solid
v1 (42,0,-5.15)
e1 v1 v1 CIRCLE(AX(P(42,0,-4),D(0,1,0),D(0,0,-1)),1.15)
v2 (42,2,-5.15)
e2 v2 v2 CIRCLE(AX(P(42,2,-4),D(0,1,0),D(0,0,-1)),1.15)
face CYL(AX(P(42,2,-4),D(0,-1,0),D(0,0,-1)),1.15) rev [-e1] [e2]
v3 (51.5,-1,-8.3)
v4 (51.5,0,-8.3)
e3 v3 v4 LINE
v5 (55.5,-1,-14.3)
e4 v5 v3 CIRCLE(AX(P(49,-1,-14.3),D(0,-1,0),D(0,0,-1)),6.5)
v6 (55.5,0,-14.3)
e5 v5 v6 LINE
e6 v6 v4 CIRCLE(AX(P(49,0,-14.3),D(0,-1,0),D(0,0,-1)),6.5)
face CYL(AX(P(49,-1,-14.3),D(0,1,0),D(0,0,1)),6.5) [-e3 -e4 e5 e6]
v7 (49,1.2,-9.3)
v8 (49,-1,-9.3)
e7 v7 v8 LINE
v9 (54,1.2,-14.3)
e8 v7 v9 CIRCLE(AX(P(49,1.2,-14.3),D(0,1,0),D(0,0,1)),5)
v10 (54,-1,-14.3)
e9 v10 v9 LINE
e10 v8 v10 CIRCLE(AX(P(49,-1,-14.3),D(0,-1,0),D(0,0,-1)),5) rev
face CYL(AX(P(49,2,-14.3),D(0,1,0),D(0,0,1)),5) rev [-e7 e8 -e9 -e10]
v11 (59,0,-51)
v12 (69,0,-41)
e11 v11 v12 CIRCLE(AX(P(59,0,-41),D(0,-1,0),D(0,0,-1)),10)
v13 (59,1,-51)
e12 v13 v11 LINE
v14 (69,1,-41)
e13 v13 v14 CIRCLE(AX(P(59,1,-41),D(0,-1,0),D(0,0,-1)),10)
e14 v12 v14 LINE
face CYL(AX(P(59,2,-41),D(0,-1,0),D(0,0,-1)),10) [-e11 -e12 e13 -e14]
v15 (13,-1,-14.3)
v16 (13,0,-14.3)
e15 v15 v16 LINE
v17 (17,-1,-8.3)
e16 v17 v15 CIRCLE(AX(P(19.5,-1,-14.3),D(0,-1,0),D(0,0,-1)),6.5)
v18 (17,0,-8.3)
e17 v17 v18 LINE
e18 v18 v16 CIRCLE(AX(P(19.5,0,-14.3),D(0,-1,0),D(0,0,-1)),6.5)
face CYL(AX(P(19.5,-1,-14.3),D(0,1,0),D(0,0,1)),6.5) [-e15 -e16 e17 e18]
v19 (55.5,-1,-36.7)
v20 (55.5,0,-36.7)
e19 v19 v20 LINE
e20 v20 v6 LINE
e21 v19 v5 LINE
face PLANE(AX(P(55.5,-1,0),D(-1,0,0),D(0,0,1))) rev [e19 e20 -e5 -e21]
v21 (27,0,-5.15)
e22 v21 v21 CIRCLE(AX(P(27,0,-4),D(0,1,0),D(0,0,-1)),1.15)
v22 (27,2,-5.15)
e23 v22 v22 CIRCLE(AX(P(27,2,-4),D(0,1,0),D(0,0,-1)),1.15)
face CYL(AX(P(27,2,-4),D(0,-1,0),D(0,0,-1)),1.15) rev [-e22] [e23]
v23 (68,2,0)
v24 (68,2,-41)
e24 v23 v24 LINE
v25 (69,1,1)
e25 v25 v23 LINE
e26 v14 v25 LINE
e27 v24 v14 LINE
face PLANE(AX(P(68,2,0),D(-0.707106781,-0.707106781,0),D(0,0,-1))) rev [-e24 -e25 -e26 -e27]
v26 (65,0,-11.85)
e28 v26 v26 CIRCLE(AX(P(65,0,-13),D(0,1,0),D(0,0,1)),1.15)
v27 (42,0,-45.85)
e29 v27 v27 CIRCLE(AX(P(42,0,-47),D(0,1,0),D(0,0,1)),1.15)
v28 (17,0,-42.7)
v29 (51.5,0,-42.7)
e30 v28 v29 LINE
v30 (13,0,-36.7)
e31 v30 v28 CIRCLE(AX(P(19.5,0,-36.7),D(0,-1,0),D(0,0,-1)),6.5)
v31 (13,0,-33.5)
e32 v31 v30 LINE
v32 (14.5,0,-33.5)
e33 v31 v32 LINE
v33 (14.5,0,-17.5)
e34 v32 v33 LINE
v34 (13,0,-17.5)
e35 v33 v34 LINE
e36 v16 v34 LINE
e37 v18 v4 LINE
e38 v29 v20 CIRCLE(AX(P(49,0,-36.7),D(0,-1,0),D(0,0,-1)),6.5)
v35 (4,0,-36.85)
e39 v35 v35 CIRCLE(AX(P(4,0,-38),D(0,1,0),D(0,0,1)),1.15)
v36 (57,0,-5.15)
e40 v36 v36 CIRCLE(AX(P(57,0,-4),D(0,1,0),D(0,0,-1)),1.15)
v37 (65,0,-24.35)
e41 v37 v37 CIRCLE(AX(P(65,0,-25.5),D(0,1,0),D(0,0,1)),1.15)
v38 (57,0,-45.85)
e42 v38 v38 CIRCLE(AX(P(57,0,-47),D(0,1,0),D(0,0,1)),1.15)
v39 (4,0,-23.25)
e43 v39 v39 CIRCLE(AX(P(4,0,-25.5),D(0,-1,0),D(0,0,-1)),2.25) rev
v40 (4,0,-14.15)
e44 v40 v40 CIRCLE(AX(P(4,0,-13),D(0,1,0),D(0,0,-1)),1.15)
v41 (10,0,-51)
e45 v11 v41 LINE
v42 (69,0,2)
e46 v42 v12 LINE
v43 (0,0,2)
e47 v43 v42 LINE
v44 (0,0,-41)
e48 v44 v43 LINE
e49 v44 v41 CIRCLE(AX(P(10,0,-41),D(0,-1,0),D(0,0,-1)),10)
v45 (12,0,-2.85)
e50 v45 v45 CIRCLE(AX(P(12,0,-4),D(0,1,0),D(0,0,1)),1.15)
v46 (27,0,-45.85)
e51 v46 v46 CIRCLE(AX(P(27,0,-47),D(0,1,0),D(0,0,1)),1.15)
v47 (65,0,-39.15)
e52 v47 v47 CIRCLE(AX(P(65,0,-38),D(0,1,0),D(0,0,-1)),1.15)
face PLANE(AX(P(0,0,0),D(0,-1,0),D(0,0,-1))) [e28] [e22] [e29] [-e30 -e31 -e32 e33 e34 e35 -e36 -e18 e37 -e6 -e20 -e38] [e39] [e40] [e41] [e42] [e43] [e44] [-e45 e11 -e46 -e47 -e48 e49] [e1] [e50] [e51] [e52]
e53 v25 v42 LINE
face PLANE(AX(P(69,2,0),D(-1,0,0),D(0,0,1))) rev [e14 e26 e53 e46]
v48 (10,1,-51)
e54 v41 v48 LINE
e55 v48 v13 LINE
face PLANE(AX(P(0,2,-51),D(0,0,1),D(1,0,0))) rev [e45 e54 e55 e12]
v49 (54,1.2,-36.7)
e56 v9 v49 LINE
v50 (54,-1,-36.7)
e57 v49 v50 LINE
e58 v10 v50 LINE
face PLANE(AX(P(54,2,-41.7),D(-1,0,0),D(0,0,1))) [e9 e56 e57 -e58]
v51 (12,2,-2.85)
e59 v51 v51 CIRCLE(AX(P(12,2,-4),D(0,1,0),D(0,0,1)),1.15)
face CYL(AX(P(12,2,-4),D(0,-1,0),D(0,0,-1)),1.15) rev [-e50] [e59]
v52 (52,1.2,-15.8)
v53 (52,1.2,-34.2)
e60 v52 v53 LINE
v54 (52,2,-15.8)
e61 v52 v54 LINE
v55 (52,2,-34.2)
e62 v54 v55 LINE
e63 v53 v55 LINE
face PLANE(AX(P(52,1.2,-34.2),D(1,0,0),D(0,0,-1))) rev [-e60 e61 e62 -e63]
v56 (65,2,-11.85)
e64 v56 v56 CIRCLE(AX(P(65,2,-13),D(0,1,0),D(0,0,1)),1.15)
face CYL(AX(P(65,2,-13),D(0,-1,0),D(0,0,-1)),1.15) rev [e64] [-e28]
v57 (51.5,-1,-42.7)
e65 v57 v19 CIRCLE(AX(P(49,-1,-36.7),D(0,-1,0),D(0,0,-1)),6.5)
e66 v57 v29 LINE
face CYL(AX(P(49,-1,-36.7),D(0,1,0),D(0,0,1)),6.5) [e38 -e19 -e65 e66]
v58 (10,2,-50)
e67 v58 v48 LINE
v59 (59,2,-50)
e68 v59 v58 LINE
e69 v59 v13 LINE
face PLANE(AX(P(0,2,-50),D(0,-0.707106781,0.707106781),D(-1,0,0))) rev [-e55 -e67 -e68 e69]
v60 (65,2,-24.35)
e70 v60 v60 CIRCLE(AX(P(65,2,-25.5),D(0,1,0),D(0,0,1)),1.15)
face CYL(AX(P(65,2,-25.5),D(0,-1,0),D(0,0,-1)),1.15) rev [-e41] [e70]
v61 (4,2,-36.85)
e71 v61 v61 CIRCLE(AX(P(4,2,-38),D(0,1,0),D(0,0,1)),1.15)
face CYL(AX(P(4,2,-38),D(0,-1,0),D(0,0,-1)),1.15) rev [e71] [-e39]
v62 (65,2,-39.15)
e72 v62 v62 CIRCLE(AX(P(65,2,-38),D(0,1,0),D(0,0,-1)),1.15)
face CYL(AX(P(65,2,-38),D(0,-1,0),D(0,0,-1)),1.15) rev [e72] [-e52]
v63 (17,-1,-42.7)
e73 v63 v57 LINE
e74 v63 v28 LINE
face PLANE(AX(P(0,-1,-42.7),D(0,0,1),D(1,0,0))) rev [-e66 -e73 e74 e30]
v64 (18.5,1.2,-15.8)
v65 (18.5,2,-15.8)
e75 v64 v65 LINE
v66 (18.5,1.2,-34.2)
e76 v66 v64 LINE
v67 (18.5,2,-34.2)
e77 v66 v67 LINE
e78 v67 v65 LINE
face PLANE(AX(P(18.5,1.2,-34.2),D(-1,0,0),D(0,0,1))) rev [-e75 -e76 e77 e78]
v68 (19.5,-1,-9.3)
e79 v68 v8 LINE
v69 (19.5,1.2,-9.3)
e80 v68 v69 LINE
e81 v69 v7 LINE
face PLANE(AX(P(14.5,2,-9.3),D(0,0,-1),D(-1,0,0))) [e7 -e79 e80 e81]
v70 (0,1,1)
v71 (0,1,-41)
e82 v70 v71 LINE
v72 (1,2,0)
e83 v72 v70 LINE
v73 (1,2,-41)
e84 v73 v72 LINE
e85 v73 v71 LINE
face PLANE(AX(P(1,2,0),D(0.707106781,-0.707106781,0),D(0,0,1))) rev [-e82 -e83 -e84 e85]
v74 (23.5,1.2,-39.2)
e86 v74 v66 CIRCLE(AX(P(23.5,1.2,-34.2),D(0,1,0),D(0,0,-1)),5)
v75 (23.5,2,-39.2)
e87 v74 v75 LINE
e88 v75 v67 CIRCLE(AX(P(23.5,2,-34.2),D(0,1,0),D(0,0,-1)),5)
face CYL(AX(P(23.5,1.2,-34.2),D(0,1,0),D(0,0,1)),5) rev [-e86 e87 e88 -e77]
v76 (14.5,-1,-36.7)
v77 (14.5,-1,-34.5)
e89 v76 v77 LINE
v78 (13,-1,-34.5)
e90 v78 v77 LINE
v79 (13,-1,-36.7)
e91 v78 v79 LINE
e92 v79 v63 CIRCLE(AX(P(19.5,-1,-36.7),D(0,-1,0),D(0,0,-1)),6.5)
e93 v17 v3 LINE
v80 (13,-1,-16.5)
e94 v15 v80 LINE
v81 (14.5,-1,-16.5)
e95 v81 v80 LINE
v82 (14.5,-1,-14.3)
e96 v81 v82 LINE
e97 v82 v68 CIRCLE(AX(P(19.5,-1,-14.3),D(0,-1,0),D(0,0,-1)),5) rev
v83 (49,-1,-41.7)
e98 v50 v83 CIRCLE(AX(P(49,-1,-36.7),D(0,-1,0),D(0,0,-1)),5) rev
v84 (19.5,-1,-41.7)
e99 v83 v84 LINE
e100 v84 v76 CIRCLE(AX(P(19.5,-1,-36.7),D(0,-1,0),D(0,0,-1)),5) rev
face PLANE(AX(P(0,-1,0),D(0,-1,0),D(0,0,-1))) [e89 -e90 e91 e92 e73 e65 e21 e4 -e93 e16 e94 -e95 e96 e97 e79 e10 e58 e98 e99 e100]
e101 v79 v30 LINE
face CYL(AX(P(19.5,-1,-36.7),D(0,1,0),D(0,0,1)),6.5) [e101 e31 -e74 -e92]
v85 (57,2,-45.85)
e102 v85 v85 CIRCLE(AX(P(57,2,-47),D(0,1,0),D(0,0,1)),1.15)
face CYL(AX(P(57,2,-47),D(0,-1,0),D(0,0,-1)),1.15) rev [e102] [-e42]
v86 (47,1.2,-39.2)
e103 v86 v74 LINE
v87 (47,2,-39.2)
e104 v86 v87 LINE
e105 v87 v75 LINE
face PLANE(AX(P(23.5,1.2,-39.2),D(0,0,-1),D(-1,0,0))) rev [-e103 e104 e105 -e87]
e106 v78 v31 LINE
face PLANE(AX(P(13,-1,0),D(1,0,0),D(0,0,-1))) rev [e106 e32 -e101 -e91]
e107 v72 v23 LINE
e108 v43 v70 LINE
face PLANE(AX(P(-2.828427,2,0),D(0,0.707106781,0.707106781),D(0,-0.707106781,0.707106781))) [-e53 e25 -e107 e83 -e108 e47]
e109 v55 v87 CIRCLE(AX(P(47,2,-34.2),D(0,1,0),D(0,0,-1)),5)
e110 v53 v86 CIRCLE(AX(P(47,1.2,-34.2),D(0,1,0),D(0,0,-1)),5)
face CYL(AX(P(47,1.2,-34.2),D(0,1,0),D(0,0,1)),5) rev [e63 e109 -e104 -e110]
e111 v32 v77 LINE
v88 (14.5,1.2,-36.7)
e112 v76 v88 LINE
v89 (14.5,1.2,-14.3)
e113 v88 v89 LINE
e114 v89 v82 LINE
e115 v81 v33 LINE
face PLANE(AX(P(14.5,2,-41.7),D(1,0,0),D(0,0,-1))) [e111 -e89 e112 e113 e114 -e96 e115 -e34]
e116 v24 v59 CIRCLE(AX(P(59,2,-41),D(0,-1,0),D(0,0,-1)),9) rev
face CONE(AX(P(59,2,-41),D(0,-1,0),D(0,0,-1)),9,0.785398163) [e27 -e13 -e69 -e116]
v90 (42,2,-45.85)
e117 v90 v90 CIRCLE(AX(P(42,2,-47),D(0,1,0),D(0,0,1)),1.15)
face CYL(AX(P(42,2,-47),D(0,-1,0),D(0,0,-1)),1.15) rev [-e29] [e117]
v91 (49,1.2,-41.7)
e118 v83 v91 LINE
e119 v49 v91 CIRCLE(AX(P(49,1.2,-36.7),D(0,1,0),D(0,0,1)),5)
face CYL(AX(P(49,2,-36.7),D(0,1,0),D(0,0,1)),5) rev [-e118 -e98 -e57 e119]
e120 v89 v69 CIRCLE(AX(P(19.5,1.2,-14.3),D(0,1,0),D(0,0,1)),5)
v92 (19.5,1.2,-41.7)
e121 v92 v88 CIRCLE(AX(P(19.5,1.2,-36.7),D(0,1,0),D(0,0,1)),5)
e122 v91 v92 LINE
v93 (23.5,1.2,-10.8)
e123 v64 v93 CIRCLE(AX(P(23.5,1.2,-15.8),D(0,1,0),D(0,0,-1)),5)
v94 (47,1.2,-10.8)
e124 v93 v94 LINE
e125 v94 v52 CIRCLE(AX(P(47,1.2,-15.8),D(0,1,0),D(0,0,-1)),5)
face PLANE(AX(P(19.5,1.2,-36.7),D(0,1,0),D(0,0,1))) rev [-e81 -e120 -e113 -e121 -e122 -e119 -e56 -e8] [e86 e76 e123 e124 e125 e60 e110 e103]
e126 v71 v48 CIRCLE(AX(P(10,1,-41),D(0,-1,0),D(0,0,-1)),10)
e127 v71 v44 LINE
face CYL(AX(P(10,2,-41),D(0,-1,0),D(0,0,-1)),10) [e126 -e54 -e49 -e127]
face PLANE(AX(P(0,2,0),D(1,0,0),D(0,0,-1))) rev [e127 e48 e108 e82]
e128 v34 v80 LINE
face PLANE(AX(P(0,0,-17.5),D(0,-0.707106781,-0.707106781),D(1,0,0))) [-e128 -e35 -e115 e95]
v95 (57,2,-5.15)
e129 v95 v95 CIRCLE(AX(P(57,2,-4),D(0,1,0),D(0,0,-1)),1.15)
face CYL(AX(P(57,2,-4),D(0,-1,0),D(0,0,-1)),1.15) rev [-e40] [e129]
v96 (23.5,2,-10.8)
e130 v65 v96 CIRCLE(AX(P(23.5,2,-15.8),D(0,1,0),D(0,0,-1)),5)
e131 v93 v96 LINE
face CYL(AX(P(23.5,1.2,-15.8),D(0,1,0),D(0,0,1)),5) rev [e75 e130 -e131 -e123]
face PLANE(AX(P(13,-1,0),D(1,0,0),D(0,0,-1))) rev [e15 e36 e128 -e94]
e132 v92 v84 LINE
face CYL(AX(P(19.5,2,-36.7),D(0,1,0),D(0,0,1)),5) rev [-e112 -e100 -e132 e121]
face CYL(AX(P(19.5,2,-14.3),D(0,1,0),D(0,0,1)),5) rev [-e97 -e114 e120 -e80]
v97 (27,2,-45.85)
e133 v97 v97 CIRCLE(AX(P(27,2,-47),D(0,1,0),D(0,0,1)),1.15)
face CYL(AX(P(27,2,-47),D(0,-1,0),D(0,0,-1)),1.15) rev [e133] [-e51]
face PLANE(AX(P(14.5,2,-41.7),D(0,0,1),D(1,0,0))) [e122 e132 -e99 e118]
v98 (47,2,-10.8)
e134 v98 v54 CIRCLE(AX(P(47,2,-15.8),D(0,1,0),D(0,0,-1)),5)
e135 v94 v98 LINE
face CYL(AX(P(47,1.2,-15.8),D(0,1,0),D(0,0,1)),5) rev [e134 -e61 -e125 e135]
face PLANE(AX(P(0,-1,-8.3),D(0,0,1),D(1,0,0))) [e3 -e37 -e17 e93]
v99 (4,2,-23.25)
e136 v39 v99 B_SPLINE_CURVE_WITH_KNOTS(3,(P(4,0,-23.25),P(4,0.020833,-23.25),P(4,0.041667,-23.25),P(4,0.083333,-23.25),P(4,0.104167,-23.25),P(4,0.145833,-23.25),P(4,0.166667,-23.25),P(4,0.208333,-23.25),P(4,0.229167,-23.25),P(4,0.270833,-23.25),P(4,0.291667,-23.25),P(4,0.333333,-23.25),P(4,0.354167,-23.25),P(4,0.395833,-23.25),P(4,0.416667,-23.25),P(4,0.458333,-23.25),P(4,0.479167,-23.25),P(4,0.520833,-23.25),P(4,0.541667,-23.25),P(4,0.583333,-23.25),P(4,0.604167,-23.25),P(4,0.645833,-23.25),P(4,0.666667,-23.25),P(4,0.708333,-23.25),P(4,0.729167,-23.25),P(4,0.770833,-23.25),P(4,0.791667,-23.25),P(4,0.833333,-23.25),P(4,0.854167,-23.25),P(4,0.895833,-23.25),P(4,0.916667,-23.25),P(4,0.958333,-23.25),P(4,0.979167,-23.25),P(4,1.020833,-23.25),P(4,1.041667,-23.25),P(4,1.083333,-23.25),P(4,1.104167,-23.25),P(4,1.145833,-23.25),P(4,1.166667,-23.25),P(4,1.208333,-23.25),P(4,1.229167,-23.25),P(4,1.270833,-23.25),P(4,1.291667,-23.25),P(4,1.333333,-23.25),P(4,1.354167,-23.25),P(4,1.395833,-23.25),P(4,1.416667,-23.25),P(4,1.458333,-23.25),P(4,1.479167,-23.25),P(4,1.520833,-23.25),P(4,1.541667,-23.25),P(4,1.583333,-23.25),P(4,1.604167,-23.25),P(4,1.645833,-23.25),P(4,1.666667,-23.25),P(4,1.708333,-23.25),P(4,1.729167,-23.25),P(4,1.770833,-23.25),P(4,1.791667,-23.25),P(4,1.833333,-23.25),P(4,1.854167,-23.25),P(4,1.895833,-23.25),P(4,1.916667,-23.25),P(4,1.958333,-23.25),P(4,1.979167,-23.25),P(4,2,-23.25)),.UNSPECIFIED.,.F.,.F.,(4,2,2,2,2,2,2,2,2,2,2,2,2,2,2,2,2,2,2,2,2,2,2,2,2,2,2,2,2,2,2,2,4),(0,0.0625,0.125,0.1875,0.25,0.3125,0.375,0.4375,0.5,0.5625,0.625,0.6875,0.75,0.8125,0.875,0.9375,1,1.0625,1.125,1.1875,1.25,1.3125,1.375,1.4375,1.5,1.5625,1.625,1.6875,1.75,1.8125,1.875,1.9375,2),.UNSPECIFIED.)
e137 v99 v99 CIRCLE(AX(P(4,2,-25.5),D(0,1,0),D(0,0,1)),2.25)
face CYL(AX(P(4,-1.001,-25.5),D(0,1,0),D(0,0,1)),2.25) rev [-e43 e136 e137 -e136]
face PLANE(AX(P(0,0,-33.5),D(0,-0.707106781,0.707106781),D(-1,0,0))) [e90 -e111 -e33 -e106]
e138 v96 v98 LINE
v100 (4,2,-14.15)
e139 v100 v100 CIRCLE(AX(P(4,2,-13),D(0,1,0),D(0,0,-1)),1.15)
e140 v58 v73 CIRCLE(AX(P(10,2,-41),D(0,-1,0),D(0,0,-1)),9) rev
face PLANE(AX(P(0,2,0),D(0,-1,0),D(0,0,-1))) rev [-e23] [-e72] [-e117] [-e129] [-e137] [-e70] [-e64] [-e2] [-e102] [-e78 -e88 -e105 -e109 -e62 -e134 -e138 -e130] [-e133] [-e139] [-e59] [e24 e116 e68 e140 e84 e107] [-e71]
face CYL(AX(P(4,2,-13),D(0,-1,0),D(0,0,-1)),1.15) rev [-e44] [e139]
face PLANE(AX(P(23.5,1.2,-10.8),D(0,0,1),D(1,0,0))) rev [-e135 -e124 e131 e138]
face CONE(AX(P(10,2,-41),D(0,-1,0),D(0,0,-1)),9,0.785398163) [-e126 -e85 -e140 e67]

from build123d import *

# Parameters (mm, degrees)
SKETCH_1_W          = 69
SKETCH_1_H          = 51
SKETCH_1_R          = 1.15
SKETCH_1_W_2        = 39.5
SKETCH_1_H_2        = 32.4
EXTRUDE_1_DEPTH     = 2
FILLET_1_R          = 10
FILLET_2_R          = 5
EXTRUDE_2_DEPTH     = 0.8
EXTRUDE_4_DEPTH     = 69
CHAMFER_1_SIZE      = 1
EXTRUDE_3_DEPTH     = 1
SKETCH_5_W          = 1.5
SKETCH_5_H          = 18
CUT_EXTRUDE_1_DEPTH = 1
CHAMFER_2_SIZE      = 1
CUT_EXTRUDE_2_REACH = 87.855
SKETCH_7_R          = 2.25


with BuildPart() as part:
    # 草图1 → 凸台-拉伸1 (new body)
    with BuildSketch(Plane(origin=(0, 0, 0), x_dir=(1, 0, 0), z_dir=(0, 1, 0))):
        with Locations((34.5, 25.5)):
            Rectangle(SKETCH_1_W, SKETCH_1_H)
        with Locations(Location((4, 25.5, 0), (0, 0, 270))):
            Circle(SKETCH_1_R, mode=Mode.SUBTRACT)
        with Locations(Location((65, 25.5, 0), (0, 0, 270))):
            Circle(SKETCH_1_R, mode=Mode.SUBTRACT)
        with Locations(Location((27, 47, 0), (0, 0, 270))):
            Circle(SKETCH_1_R, mode=Mode.SUBTRACT)
        with Locations(Location((42, 47, 0), (0, 0, 270))):
            Circle(SKETCH_1_R, mode=Mode.SUBTRACT)
        with Locations(Location((42, 4, 0), (0, 0, 90))):
            Circle(SKETCH_1_R, mode=Mode.SUBTRACT)
        with Locations(Location((27, 4, 0), (0, 0, 90))):
            Circle(SKETCH_1_R, mode=Mode.SUBTRACT)
        with Locations(Location((4, 38, 0), (0, 0, 270))):
            Circle(SKETCH_1_R, mode=Mode.SUBTRACT)
        with Locations(Location((4, 13, 0), (0, 0, 90))):
            Circle(SKETCH_1_R, mode=Mode.SUBTRACT)
        with Locations(Location((65, 13, 0), (0, 0, 270))):
            Circle(SKETCH_1_R, mode=Mode.SUBTRACT)
        with Locations(Location((65, 38, 0), (0, 0, 90))):
            Circle(SKETCH_1_R, mode=Mode.SUBTRACT)
        with Locations(Location((57, 47, 0), (0, 0, 270))):
            Circle(SKETCH_1_R, mode=Mode.SUBTRACT)
        with Locations(Location((57, 4, 0), (0, 0, 90))):
            Circle(SKETCH_1_R, mode=Mode.SUBTRACT)
        with Locations(Location((12, 4, 0), (0, 0, 270))):
            Circle(SKETCH_1_R, mode=Mode.SUBTRACT)
        with Locations((34.25, 25.5)):
            Rectangle(SKETCH_1_W_2, SKETCH_1_H_2, mode=Mode.SUBTRACT)
    extrude(amount=EXTRUDE_1_DEPTH)

    # 圆角1
    fillet_1_edges = [part.edges().sort_by_distance(p)[0] for p in [
        (0, 1, -51),
        (69, 1, -51),
    ]]
    fillet(fillet_1_edges, radius=FILLET_1_R)

    # 圆角2
    fillet_2_edges = [part.edges().sort_by_distance(p)[0] for p in [
        (14.5, 1, -41.7),
        (14.5, 1, -9.3),
        (54, 1, -9.3),
        (54, 1, -41.7),
    ]]
    fillet(fillet_2_edges, radius=FILLET_2_R)

    # 草图2 → 凸台-拉伸2 (add)
    with BuildSketch(Plane(origin=(0, 2, 0), x_dir=(1, 0, 0), z_dir=(0, 1, 0))):
        with BuildLine():
            Line((54, 14.3), (54, 36.7))
            ThreePointArc((54, 36.7), (52.535533906, 40.235533906), (49, 41.7))
            Line((49, 41.7), (19.5, 41.7))
            ThreePointArc((19.5, 41.7), (15.964466094, 40.235533906), (14.5, 36.7))
            Line((14.5, 36.7), (14.5, 14.3))
            ThreePointArc((14.5, 14.3), (15.964466094, 10.764466094), (19.5, 9.3))
            Line((19.5, 9.3), (49, 9.3))
            ThreePointArc((49, 9.3), (52.535533906, 10.764466094), (54, 14.3))
        make_face()
        with BuildLine():
            Line((23.5, 39.2), (47, 39.2))
            ThreePointArc((47, 39.2), (50.535533906, 37.735533906), (52, 34.2))
            Line((52, 34.2), (52, 15.8))
            ThreePointArc((52, 15.8), (50.535533906, 12.264466094), (47, 10.8))
            Line((47, 10.8), (23.5, 10.8))
            ThreePointArc((23.5, 10.8), (19.964466094, 12.264466094), (18.5, 15.8))
            Line((18.5, 15.8), (18.5, 34.2))
            ThreePointArc((18.5, 34.2), (19.964466094, 37.735533906), (23.5, 39.2))
        make_face(mode=Mode.SUBTRACT)
    extrude(amount=-EXTRUDE_2_DEPTH)

    # 草图4 → 凸台-拉伸4 (add)
    with BuildSketch(Plane(origin=(69, 0, 0), x_dir=(0, 0, -1), z_dir=(1, 0, 0))):
        Polygon((0, 2), (-2, 0), (0, 0), align=None)
    extrude(amount=-EXTRUDE_4_DEPTH)

    # 倒角1
    chamfer_1_edges = [part.edges().sort_by_distance(p)[0] for p in [
        (69, 2, -20.5),
        (34.5, 2, -51),
        (0, 2, -20.5),
        (2.928932188, 2, -48.071067812),
        (66.071067812, 2, -48.071067812),
    ]]
    chamfer(chamfer_1_edges, length=CHAMFER_1_SIZE)

    # 草图3 → 凸台-拉伸3 (add)
    with BuildSketch(Plane.XZ):
        with BuildLine():
            ThreePointArc((17, -8.3), (14.091673087, -10.694448725), (13, -14.3))
            Line((13, -14.3), (13, -36.7))
            ThreePointArc((13, -36.7), (14.091673087, -40.305551275), (17, -42.7))
            Line((17, -42.7), (51.5, -42.7))
            ThreePointArc((51.5, -42.7), (54.408326913, -40.305551275), (55.5, -36.7))
            Line((55.5, -36.7), (55.5, -14.3))
            ThreePointArc((55.5, -14.3), (54.408326913, -10.694448725), (51.5, -8.3))
            Line((51.5, -8.3), (17, -8.3))
        make_face()
        with BuildLine():
            Line((54, -14.3), (54, -36.7))
            ThreePointArc((54, -36.7), (52.535533906, -40.235533906), (49, -41.7))
            Line((49, -41.7), (19.5, -41.7))
            ThreePointArc((19.5, -41.7), (15.964466094, -40.235533906), (14.5, -36.7))
            Line((14.5, -36.7), (14.5, -14.3))
            ThreePointArc((14.5, -14.3), (15.964466094, -10.764466094), (19.5, -9.3))
            Line((19.5, -9.3), (49, -9.3))
            ThreePointArc((49, -9.3), (52.535533906, -10.764466094), (54, -14.3))
        make_face(mode=Mode.SUBTRACT)
    extrude(amount=EXTRUDE_3_DEPTH)

    # 草图5 → 切除-拉伸1 (cut)
    with BuildSketch(Plane.XZ):
        with Locations((13.75, -25.5)):
            Rectangle(SKETCH_5_W, SKETCH_5_H)
    extrude(amount=CUT_EXTRUDE_1_DEPTH, mode=Mode.SUBTRACT)

    # 倒角2
    chamfer_2_edges = [part.edges().sort_by_distance(p)[0] for p in [
        (13.75, 0, -34.5),
        (13.75, 0, -16.5),
    ]]
    chamfer(chamfer_2_edges, length=CHAMFER_2_SIZE - 0.0001)  # a hair under: the kernel refuses the full size

    # 草图7 → 切除-拉伸2 (cut, up to next)
    with BuildSketch(Plane(origin=(0, 2, 0), x_dir=(1, 0, 0), z_dir=(0, 1, 0)), mode=Mode.PRIVATE) as cut_extrude_2_sk1:
        with Locations(Location((4, 25.5, 0), (0, 0, 270))):
            Circle(SKETCH_7_R)
    cut_extrude_2_tool1 = extrude(cut_extrude_2_sk1.sketch, amount=-CUT_EXTRUDE_2_REACH, mode=Mode.PRIVATE) & part.part
    add(cut_extrude_2_tool1.solids().sort_by_distance((4, 2, -25.5))[0], mode=Mode.SUBTRACT)


solid = part.part
